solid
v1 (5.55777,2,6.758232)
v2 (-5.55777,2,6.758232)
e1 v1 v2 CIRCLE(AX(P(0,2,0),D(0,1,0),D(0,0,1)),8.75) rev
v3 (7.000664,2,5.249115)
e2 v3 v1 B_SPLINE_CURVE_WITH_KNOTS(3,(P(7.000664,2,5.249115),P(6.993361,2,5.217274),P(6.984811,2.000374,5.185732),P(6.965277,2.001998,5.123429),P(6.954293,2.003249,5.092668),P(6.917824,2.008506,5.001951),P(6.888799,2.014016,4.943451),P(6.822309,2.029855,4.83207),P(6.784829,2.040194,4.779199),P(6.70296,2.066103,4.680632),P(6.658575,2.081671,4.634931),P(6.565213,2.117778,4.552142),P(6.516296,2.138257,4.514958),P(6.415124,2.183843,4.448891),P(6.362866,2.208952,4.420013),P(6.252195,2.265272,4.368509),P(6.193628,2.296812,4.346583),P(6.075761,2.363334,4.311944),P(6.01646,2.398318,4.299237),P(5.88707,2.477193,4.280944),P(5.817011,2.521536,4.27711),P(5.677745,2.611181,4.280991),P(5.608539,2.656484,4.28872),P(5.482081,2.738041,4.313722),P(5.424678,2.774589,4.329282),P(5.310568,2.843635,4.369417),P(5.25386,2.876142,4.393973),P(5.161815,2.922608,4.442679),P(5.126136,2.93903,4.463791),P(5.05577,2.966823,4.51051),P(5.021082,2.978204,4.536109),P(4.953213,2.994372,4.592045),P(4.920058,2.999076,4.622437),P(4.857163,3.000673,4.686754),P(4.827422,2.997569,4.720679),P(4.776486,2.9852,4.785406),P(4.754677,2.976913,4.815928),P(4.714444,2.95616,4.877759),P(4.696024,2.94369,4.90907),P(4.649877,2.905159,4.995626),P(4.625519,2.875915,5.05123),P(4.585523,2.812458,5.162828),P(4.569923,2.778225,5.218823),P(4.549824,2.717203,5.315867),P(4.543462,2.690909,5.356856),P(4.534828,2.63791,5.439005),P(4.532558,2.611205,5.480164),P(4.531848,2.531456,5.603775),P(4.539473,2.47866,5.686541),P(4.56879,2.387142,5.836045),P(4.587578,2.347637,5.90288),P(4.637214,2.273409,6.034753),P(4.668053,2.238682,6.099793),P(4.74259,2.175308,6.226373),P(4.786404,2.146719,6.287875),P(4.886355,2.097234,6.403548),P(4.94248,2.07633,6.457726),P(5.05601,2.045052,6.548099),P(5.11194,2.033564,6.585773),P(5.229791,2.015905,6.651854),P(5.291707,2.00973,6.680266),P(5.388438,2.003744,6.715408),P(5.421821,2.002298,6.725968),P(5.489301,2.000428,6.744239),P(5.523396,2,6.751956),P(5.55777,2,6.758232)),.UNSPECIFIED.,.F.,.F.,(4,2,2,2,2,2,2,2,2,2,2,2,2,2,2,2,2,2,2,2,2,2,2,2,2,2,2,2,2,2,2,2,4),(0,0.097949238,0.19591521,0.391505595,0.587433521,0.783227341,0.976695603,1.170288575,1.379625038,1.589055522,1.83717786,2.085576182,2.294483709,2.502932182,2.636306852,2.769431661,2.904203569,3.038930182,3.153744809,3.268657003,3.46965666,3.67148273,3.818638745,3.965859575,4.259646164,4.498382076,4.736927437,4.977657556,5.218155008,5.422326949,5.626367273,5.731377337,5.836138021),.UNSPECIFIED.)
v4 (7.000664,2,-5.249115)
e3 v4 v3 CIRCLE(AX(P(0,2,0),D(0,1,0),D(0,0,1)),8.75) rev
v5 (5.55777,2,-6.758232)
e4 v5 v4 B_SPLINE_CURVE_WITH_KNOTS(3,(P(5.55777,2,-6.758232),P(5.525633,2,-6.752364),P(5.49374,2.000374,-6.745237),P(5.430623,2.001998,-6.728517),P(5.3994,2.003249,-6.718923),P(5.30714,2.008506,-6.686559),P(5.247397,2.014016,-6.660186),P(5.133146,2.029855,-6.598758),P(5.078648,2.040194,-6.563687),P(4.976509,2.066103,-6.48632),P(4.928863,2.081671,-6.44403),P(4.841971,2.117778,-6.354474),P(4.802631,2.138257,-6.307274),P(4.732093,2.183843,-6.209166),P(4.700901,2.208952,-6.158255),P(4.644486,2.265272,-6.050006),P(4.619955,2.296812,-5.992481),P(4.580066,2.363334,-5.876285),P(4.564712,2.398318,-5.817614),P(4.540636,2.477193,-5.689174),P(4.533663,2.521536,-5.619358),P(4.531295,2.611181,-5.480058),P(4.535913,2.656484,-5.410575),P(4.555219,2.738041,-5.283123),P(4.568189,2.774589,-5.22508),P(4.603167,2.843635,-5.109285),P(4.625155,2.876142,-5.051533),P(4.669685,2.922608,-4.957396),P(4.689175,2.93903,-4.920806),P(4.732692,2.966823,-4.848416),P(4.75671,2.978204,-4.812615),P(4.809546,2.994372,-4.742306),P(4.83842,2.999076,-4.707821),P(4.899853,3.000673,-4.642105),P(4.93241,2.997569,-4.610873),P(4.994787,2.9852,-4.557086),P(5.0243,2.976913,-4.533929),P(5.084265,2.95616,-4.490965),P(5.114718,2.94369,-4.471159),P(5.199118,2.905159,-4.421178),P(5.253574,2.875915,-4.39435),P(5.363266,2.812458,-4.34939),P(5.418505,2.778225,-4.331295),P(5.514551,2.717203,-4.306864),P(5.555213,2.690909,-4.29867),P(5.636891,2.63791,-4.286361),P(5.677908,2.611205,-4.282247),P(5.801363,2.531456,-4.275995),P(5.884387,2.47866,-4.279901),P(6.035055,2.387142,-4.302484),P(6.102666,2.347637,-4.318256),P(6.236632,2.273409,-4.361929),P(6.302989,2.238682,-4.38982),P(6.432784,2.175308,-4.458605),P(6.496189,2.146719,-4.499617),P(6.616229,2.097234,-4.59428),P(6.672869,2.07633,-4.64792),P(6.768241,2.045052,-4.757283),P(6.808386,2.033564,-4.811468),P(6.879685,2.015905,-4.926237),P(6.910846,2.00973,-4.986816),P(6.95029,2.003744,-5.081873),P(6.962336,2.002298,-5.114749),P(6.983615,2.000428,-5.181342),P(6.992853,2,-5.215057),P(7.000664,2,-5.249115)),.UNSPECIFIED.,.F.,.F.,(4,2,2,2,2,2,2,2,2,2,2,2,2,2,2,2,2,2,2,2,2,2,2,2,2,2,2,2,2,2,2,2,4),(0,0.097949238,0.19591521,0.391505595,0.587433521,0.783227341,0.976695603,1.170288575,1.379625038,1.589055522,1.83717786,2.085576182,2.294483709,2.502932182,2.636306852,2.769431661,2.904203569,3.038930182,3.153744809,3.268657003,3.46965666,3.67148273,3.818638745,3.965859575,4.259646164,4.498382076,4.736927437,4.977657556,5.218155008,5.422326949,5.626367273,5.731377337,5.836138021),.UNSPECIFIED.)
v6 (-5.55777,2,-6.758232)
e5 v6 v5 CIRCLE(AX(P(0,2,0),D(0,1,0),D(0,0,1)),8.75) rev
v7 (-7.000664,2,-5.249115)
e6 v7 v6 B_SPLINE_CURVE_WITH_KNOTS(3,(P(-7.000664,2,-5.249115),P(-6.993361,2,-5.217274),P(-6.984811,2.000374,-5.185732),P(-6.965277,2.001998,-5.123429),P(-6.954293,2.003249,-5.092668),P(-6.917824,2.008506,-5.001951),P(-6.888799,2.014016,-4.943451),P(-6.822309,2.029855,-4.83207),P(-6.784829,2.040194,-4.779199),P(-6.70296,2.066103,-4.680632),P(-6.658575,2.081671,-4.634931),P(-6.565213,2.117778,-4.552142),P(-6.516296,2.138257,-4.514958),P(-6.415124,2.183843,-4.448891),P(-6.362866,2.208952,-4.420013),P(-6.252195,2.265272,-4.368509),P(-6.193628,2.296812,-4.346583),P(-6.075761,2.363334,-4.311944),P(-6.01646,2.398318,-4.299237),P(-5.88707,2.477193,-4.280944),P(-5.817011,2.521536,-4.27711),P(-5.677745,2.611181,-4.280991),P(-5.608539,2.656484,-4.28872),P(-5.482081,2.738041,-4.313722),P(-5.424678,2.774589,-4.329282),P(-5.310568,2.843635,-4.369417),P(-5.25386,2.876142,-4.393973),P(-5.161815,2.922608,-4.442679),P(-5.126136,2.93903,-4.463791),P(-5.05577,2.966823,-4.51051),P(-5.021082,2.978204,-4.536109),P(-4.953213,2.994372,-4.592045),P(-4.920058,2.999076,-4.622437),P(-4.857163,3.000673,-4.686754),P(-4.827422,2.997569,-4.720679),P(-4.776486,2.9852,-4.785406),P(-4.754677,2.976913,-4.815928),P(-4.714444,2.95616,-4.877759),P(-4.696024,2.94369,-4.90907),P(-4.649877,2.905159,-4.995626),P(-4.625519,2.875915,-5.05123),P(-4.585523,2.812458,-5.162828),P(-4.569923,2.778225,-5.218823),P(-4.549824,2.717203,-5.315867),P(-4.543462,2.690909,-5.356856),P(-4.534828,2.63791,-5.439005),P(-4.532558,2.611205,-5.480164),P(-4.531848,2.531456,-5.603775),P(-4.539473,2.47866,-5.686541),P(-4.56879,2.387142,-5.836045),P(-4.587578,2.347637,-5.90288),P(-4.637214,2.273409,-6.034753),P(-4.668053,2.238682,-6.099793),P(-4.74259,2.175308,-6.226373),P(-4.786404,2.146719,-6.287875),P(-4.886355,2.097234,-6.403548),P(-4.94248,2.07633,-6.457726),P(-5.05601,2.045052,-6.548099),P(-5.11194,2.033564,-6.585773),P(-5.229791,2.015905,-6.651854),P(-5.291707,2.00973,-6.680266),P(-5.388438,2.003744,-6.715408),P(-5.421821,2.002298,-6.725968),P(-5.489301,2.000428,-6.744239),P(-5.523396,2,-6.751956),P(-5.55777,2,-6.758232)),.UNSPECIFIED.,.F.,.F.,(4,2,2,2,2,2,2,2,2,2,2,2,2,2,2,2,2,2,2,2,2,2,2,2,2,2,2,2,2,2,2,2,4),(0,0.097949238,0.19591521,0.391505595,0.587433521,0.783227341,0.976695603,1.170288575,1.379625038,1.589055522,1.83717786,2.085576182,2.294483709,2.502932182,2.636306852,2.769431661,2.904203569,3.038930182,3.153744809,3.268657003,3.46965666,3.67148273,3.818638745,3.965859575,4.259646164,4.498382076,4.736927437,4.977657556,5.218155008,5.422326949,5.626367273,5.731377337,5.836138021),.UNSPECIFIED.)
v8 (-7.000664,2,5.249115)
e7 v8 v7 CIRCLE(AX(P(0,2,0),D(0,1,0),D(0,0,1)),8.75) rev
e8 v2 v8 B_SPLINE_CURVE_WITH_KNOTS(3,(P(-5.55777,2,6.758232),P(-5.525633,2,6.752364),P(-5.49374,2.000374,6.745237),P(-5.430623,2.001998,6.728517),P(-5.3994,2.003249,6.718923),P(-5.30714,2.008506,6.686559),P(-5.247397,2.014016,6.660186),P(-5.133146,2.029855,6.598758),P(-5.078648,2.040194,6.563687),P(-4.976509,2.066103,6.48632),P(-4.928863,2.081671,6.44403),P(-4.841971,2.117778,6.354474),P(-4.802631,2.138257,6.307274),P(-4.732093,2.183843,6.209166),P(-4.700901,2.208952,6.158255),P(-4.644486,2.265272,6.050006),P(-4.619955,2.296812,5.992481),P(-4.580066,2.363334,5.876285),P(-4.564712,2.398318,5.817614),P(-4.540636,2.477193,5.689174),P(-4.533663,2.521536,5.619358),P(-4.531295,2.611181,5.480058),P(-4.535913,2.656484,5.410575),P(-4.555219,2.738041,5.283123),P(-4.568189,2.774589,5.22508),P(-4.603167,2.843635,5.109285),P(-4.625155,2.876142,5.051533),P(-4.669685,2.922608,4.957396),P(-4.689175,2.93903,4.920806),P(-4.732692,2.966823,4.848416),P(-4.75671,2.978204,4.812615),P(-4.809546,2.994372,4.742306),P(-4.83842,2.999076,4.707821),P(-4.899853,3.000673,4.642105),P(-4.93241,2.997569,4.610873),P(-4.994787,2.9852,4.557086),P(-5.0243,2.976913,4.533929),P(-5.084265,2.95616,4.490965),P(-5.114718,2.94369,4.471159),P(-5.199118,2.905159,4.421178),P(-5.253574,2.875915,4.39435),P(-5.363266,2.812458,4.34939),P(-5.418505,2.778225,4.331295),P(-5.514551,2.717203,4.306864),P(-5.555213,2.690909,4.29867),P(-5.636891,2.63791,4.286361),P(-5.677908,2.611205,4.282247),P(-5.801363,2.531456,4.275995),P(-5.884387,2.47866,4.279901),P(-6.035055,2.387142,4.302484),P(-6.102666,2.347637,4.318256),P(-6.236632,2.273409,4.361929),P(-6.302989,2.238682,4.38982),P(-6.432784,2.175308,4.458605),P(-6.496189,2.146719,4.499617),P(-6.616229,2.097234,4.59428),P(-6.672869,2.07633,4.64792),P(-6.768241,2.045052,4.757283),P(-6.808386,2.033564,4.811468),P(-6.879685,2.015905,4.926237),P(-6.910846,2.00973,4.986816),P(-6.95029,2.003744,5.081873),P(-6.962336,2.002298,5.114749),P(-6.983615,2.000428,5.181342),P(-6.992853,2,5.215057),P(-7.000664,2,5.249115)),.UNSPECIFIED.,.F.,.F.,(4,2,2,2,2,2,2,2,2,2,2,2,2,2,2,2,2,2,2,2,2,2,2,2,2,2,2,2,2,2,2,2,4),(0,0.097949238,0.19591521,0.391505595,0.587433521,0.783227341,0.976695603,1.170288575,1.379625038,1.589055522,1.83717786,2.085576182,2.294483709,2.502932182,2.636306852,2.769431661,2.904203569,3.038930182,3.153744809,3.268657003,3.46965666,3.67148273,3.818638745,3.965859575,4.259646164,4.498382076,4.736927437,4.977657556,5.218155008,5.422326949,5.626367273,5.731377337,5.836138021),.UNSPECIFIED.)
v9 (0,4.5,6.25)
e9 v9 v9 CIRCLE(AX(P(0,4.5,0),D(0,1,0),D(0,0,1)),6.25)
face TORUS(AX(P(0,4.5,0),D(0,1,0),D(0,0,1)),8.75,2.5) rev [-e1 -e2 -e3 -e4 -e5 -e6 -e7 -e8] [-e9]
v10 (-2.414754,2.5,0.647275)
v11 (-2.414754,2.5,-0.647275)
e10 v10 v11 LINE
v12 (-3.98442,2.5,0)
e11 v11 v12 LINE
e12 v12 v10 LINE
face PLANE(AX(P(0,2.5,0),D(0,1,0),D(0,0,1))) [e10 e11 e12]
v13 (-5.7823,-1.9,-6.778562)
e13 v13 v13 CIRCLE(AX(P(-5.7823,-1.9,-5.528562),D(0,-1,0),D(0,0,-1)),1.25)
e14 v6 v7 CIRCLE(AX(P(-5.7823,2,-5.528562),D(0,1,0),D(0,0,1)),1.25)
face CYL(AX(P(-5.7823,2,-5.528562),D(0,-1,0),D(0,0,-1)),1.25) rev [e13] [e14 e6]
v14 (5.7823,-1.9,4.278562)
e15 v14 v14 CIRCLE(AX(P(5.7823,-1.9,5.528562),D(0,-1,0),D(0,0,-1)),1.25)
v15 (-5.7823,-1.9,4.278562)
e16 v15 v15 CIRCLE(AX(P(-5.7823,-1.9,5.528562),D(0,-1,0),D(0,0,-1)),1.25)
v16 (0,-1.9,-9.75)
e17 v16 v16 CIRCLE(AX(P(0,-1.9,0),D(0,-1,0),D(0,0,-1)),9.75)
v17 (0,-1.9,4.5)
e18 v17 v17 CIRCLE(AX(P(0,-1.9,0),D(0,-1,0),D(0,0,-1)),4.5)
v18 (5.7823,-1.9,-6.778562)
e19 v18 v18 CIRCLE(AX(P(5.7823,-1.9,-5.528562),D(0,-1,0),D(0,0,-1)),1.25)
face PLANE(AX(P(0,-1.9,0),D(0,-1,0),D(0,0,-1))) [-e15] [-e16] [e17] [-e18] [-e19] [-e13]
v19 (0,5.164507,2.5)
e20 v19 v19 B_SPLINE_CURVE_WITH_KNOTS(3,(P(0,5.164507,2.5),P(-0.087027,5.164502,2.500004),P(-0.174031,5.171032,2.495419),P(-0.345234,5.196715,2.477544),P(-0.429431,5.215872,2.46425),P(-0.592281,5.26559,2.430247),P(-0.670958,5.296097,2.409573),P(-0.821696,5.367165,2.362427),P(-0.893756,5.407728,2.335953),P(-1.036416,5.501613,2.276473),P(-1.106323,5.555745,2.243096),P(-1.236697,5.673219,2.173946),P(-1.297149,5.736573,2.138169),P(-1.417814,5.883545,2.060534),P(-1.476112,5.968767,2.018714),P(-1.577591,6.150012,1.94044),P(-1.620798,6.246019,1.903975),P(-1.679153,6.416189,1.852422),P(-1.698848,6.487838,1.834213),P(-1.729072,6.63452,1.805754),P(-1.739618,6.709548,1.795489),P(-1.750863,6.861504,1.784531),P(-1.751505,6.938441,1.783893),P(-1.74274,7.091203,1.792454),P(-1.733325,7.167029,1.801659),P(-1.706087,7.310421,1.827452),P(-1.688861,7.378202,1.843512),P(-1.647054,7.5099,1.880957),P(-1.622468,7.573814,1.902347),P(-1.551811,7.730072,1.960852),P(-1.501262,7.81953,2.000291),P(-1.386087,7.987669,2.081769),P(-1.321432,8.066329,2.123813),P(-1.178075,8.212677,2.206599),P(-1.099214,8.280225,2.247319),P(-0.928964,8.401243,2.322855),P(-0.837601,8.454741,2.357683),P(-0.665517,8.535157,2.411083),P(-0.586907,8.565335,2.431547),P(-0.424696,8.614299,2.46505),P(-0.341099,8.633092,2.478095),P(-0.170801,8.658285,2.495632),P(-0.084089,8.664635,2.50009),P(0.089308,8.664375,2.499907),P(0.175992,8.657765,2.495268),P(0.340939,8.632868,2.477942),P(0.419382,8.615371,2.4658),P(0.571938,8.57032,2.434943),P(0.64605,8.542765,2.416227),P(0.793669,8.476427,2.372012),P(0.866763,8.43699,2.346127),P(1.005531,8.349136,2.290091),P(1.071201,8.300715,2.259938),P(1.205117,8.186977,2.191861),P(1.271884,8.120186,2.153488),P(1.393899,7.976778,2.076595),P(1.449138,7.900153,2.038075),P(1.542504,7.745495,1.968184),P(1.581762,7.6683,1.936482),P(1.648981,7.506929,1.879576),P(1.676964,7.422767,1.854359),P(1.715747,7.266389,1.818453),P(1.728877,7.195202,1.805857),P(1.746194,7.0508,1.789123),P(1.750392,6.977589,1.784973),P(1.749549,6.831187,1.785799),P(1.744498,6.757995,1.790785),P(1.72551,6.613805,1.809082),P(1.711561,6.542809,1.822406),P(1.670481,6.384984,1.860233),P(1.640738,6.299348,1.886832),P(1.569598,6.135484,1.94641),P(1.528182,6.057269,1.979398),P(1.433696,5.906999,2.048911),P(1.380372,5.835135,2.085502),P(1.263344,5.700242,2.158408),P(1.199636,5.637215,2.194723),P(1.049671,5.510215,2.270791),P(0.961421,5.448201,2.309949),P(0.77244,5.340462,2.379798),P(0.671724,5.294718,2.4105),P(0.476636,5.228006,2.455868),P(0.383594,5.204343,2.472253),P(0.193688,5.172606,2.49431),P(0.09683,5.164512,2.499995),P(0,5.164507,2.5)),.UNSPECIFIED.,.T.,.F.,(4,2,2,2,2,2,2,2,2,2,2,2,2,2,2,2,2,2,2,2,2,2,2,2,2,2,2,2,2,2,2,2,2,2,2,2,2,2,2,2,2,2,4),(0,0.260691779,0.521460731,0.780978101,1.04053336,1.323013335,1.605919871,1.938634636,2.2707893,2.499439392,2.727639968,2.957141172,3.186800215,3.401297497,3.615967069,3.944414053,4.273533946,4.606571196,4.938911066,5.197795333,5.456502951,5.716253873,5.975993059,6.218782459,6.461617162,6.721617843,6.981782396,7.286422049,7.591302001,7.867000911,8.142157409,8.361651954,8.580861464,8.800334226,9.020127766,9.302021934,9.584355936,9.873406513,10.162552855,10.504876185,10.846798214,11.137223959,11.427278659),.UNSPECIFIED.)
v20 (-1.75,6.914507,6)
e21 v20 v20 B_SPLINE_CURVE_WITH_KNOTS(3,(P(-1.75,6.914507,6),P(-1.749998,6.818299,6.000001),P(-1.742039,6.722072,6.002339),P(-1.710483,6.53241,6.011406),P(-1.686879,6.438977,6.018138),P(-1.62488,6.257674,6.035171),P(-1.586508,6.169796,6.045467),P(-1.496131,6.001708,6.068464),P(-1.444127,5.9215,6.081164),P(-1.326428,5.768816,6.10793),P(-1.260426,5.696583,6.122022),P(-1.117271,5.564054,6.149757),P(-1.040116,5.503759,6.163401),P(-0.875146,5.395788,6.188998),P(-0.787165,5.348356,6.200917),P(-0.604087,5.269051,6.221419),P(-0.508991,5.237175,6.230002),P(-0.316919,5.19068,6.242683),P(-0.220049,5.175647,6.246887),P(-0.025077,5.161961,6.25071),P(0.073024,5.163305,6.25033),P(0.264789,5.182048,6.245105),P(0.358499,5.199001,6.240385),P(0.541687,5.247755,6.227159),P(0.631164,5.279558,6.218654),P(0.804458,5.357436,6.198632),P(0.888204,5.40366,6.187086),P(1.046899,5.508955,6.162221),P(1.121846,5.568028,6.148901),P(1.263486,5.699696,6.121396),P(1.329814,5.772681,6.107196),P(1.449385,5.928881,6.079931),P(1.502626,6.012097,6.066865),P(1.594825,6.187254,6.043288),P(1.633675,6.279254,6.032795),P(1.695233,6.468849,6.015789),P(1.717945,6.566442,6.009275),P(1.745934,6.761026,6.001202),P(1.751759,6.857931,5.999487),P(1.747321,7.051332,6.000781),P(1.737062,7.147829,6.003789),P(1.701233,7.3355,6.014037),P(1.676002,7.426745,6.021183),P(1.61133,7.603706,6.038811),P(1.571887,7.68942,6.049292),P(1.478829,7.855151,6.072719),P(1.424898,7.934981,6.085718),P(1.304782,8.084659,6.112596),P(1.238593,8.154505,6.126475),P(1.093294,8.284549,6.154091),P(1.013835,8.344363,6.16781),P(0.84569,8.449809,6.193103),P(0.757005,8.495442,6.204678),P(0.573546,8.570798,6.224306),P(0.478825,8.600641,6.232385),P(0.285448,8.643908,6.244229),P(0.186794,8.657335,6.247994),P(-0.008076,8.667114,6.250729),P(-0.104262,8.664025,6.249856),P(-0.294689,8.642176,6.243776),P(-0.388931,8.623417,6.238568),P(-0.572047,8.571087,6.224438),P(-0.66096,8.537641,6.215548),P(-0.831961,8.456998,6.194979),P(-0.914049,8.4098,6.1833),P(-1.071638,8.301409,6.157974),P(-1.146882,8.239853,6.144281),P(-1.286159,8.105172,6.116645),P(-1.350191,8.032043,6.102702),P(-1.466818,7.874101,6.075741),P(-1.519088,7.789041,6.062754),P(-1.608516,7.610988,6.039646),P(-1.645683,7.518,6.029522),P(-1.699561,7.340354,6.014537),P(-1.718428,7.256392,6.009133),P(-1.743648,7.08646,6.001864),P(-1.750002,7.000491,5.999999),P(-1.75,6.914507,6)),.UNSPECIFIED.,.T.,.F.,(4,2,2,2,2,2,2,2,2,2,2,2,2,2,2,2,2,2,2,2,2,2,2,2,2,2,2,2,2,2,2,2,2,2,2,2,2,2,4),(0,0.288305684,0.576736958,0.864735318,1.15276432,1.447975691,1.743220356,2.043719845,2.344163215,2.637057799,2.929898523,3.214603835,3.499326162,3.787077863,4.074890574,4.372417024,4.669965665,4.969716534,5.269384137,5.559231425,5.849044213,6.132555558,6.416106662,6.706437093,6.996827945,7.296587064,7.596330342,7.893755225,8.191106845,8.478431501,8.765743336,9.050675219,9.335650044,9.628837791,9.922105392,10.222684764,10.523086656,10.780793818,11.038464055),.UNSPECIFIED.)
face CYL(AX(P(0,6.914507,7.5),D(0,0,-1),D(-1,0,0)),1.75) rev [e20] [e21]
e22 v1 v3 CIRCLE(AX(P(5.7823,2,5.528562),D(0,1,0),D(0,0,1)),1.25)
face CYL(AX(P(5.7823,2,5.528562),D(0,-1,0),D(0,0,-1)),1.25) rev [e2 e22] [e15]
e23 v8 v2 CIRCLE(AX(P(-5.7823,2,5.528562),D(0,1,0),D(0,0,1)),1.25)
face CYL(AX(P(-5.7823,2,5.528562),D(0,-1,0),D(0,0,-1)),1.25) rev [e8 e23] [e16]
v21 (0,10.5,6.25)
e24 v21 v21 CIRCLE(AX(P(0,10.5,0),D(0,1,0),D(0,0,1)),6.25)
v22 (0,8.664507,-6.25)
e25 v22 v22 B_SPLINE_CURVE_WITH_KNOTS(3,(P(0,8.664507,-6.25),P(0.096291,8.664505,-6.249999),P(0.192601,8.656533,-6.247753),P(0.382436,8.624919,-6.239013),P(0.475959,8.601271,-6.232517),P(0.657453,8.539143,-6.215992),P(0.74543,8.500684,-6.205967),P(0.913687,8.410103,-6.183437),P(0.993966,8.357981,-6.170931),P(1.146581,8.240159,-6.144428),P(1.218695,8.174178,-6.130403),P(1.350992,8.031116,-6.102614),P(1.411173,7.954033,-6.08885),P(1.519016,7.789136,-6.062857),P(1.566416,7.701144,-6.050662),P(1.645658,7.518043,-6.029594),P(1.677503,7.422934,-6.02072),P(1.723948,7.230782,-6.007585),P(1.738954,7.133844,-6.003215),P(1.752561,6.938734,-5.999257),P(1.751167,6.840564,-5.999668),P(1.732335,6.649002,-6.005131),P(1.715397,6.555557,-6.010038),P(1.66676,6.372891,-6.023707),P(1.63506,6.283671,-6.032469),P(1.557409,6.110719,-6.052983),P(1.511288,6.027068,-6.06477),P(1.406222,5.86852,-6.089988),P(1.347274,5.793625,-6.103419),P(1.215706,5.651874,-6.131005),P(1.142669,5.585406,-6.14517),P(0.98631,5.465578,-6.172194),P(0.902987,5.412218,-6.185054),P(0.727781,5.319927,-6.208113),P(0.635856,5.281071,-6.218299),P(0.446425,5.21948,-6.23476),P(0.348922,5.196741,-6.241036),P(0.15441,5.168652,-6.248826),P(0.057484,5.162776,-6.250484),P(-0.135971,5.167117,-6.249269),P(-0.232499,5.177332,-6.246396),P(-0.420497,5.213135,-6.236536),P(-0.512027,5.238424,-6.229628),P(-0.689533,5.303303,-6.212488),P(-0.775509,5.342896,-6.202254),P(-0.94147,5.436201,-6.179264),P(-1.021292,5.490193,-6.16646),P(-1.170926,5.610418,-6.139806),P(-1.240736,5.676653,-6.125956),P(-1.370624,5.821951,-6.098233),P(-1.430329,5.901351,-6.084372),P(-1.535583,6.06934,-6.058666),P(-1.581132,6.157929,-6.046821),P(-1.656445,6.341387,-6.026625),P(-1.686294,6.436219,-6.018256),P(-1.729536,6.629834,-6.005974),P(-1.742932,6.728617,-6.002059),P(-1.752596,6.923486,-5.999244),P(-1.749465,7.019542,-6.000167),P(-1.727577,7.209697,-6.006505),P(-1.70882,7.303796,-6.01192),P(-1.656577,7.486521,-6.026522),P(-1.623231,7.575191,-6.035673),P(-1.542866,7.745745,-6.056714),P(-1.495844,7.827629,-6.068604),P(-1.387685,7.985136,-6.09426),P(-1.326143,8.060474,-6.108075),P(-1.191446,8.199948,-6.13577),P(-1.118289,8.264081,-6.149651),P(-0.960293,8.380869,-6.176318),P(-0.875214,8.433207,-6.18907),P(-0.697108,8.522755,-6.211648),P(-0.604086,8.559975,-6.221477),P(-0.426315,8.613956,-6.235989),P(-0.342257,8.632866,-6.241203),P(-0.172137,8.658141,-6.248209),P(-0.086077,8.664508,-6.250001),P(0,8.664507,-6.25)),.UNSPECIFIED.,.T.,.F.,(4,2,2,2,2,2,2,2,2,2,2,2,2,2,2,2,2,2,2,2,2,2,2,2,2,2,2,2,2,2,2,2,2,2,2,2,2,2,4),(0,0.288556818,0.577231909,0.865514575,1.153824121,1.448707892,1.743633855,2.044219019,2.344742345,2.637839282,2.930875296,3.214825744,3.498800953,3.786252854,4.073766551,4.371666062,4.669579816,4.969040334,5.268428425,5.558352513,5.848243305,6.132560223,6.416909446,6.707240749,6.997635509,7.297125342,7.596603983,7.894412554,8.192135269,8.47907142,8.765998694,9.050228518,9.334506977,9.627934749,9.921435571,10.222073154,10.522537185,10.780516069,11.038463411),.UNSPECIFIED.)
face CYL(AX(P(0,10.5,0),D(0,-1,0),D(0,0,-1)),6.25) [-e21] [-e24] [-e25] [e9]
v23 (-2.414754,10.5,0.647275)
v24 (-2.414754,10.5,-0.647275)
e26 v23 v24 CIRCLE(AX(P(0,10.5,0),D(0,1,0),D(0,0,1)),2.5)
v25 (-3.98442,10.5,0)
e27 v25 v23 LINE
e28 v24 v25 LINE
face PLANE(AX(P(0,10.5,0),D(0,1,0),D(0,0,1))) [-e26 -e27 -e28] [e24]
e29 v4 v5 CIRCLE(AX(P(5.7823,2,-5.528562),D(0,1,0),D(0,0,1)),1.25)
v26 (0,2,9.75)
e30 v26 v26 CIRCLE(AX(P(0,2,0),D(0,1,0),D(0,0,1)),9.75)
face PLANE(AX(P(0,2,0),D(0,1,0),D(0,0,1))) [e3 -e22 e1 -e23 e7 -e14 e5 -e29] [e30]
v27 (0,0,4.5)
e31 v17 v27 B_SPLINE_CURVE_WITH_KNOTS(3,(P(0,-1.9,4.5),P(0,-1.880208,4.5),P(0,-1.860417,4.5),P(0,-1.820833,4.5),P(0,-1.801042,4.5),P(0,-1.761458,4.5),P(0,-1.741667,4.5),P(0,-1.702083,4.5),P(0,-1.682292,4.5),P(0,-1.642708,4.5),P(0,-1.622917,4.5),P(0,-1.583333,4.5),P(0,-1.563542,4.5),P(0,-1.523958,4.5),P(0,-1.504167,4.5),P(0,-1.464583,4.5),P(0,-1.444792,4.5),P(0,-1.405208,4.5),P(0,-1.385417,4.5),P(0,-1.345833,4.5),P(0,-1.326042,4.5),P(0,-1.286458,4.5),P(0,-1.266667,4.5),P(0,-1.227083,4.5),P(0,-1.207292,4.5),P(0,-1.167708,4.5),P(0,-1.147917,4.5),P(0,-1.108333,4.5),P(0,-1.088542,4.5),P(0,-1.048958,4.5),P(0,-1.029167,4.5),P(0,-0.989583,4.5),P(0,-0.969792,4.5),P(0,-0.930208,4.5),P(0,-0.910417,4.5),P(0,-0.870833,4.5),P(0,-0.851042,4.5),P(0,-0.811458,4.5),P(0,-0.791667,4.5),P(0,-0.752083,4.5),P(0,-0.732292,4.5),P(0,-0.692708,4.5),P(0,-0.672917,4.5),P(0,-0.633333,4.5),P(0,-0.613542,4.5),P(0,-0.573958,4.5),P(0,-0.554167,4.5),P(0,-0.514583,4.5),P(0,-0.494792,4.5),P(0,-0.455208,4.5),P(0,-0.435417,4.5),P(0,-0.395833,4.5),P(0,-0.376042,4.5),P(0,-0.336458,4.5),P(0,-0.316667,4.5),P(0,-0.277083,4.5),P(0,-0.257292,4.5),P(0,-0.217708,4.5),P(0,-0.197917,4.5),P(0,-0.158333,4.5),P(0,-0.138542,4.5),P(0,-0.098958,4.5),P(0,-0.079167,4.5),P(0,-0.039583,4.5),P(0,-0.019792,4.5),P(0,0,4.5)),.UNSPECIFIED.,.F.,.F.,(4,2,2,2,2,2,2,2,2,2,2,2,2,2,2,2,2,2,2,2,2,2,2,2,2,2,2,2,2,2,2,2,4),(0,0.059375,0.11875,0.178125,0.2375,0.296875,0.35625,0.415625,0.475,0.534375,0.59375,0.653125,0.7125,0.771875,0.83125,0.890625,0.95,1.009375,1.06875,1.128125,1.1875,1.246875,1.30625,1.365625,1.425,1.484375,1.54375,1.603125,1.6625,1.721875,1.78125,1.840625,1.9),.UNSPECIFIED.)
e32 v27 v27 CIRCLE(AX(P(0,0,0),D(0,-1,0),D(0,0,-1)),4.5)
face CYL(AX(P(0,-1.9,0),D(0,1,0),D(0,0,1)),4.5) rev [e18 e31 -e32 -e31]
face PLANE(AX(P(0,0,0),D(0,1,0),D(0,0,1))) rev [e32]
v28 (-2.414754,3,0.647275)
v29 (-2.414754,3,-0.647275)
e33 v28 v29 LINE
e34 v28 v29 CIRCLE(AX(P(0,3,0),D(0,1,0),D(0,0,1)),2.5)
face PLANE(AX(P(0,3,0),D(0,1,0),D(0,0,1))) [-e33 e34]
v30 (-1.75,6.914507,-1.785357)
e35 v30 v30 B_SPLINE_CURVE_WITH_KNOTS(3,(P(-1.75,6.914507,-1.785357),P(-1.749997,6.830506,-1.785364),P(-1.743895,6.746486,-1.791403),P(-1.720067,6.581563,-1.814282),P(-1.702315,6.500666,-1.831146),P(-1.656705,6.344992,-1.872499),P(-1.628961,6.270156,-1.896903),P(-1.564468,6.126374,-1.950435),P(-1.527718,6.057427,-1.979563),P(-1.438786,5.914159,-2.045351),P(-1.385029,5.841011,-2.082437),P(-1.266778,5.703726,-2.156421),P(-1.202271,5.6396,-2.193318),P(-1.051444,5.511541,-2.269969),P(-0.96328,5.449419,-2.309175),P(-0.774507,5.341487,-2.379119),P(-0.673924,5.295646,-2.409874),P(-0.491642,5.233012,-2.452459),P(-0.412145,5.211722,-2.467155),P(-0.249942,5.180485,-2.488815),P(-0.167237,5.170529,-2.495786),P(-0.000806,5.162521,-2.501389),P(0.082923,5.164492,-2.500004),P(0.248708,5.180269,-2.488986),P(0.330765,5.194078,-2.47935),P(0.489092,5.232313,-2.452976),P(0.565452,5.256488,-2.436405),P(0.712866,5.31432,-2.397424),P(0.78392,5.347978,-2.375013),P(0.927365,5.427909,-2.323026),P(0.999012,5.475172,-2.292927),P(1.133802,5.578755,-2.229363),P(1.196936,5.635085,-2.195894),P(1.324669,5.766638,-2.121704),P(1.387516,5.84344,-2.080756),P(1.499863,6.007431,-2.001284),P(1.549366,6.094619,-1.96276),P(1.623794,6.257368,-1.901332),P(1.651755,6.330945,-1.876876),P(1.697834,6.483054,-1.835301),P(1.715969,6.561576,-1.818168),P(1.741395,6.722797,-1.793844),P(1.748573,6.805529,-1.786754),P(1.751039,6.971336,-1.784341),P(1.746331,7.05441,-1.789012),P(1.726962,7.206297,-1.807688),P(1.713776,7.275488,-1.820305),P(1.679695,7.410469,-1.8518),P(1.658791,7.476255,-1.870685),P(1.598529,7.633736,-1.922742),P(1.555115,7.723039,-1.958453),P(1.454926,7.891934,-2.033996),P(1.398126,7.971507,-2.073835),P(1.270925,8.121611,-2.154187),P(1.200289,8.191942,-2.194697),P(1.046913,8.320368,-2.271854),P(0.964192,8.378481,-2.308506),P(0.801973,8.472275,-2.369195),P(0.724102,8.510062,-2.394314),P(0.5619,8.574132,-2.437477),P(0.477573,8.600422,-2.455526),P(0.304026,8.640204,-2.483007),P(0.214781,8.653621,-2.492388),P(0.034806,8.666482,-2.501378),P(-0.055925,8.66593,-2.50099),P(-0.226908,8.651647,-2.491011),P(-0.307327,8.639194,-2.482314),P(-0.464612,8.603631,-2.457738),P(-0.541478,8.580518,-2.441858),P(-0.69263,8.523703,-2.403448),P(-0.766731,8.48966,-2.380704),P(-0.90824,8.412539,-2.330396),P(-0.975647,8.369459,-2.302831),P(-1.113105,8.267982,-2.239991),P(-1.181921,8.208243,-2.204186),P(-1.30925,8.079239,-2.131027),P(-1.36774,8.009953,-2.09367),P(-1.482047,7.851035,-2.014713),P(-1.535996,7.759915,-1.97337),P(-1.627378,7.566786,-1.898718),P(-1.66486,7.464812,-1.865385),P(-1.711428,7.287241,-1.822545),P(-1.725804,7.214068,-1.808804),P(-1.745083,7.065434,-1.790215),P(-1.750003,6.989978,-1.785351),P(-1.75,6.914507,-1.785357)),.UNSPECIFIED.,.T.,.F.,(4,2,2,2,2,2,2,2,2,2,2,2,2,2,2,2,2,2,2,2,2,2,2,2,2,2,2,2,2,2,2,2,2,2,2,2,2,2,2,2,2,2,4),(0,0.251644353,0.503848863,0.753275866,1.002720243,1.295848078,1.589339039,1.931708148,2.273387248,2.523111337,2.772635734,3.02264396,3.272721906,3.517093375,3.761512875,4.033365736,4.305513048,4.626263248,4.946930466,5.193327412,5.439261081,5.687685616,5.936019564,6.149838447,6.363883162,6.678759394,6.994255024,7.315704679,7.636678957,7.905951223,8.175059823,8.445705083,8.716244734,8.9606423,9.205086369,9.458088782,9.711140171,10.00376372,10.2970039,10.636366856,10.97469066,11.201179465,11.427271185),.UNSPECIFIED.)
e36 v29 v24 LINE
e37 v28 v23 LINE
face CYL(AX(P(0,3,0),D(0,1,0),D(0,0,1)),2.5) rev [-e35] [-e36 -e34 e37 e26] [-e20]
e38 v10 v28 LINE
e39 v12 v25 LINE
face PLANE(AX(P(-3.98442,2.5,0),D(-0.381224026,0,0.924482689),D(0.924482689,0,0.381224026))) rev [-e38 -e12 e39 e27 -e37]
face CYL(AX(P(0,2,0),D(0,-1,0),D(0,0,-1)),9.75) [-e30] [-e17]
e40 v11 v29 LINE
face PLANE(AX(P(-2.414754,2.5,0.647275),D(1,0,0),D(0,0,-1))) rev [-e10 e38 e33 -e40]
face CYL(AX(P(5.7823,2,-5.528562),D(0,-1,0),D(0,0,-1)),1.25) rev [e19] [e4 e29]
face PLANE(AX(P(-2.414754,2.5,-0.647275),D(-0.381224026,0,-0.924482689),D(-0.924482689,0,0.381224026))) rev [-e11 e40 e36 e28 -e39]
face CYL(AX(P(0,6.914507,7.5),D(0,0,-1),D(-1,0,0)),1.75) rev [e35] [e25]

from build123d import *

# Parameters (mm, degrees)
SKETCH1_R               = 9.75
SKETCH1_R_2             = 1.25
BOSS_EXTRUDE2_DEPTH     = 2
SKETCH2_R               = 6.25
BOSS_EXTRUDE3_DEPTH     = 8.5
SKETCH4_R               = 2.5
CUT_EXTRUDE1_DEPTH      = 7.5
CUT_EXTRUDE2_DEPTH      = 7.5
CUT_EXTRUDE2_DEPTH_BACK = 6.75
SKETCH5_R               = 1.75
BOSS_EXTRUDE5_START     = 1.9
SKETCH7_R               = 9.75
SKETCH7_R_2             = 4.5
SKETCH7_R_3             = 1.25
BOSS_EXTRUDE5_DEPTH     = 1.9
CUT_EXTRUDE3_DEPTH      = 8
FILLET1_R               = 2.5


with BuildPart() as part:
    # Sketch1 → Boss-Extrude2 (new body)
    with BuildSketch(Plane(origin=(0, 0, 0), x_dir=(1, 0, 0), z_dir=(0, 1, 0))):
        with Locations(Location((0, 0, 0), (0, 0, 270))):
            Circle(SKETCH1_R)
        with Locations(Location((-5.78230038, 5.52856241, 0), (0, 0, 270))):
            Circle(SKETCH1_R_2, mode=Mode.SUBTRACT)
        with Locations(Location((-5.78230038, -5.52856241, 0), (0, 0, 270))):
            Circle(SKETCH1_R_2, mode=Mode.SUBTRACT)
        with Locations(Location((5.78230038, -5.52856241, 0), (0, 0, 270))):
            Circle(SKETCH1_R_2, mode=Mode.SUBTRACT)
        with Locations(Location((5.78230038, 5.52856241, 0), (0, 0, 270))):
            Circle(SKETCH1_R_2, mode=Mode.SUBTRACT)
    extrude(amount=BOSS_EXTRUDE2_DEPTH)

    # Sketch2 → Boss-Extrude3 (add)
    with BuildSketch(Plane(origin=(0, 2, 0), x_dir=(1, 0, 0), z_dir=(0, 1, 0))):
        with Locations(Location((0, 0, 0), (0, 0, 270))):
            Circle(SKETCH2_R)
    extrude(amount=BOSS_EXTRUDE3_DEPTH)

    # Sketch4 → Cut-Extrude1 (cut)
    with BuildSketch(Plane(origin=(0, 10.5, 0), x_dir=(1, 0, 0), z_dir=(0, 1, 0))):
        with Locations(Location((0, 0, 0), (0, 0, 270))):
            Circle(SKETCH4_R)
    extrude(amount=-CUT_EXTRUDE1_DEPTH, mode=Mode.SUBTRACT)

    # Sketch5 → Cut-Extrude2 (cut, two sides: drawn at the far end of the back side and taken through both)
    with BuildSketch(Plane.XY.offset(-CUT_EXTRUDE2_DEPTH_BACK)):
        with Locations(Location((0, 6.914506731, 0), (0, 0, 180))):
            Circle(SKETCH5_R)
    extrude(amount=CUT_EXTRUDE2_DEPTH + CUT_EXTRUDE2_DEPTH_BACK, mode=Mode.SUBTRACT)

    # Sketch7 → Boss-Extrude5 (add)
    with BuildSketch(Plane.XZ.offset(BOSS_EXTRUDE5_START)):
        with Locations(Location((0, 0, 0), (0, 0, 270))):
            Circle(SKETCH7_R)
        with Locations(Location((0, 0, 0), (0, 0, 90))):
            Circle(SKETCH7_R_2, mode=Mode.SUBTRACT)
        with Locations(Location((-5.78230038, 5.52856241, 0), (0, 0, 270))):
            Circle(SKETCH7_R_3, mode=Mode.SUBTRACT)
        with Locations(Location((5.78230038, 5.52856241, 0), (0, 0, 270))):
            Circle(SKETCH7_R_3, mode=Mode.SUBTRACT)
        with Locations(Location((5.78230038, -5.52856241, 0), (0, 0, 270))):
            Circle(SKETCH7_R_3, mode=Mode.SUBTRACT)
        with Locations(Location((-5.78230038, -5.52856241, 0), (0, 0, 270))):
            Circle(SKETCH7_R_3, mode=Mode.SUBTRACT)
    extrude(amount=-BOSS_EXTRUDE5_DEPTH)

    # Sketch9 → Cut-Extrude3 (cut)
    with BuildSketch(Plane(origin=(0, 10.5, 0), x_dir=(1, 0, 0), z_dir=(0, 1, 0))):
        Polygon((-2.414753661, -0.64727487), (-2.414753661, 0.64727487), (-3.984419716, 0), align=None)
    extrude(amount=-CUT_EXTRUDE3_DEPTH, mode=Mode.SUBTRACT)

    # Fillet1
    # the kernel refuses this fillet: 2.5 mm, written as the material it adds along each edge
    with BuildSketch(Plane(origin=(0, 2, 0), x_dir=(0, 0, 1), z_dir=(-1, 0, 0))) as fillet1_piece_1_section:
        with BuildLine():
            CenterArc((6.25 + FILLET1_R, FILLET1_R), FILLET1_R, 180, 90)
            Line((6.25, FILLET1_R), (6.25, 0))
            Line((6.25, 0), (6.25 + FILLET1_R, 0))
        make_face()
    fillet1_piece_1 = revolve(axis=Axis((0, 2, 0), (0, 1, 0)), mode=Mode.PRIVATE)
    fillet1_piece_1 = fillet1_piece_1 - Plane(origin=(-5.78230038, 2.704024644, 5.52856241), x_dir=(0, 0, 1), z_dir=(0, -1, 0)) * Cylinder(1.25, 35, mode=Mode.PRIVATE)
    fillet1_piece_1 = fillet1_piece_1 - Plane(origin=(5.78230038, 2.704024644, 5.52856241), x_dir=(0, 0, 1), z_dir=(0, -1, 0)) * Cylinder(1.25, 35, mode=Mode.PRIVATE)
    fillet1_piece_1 = fillet1_piece_1 - Plane(origin=(-5.78230038, 2.704024644, -5.52856241), x_dir=(0, 0, 1), z_dir=(0, -1, 0)) * Cylinder(1.25, 35, mode=Mode.PRIVATE)
    fillet1_piece_1 = fillet1_piece_1 - Plane(origin=(5.78230038, 2.704024644, -5.52856241), x_dir=(0, 0, 1), z_dir=(0, -1, 0)) * Cylinder(1.25, 35, mode=Mode.PRIVATE)
    add(fillet1_piece_1)


solid = part.part
